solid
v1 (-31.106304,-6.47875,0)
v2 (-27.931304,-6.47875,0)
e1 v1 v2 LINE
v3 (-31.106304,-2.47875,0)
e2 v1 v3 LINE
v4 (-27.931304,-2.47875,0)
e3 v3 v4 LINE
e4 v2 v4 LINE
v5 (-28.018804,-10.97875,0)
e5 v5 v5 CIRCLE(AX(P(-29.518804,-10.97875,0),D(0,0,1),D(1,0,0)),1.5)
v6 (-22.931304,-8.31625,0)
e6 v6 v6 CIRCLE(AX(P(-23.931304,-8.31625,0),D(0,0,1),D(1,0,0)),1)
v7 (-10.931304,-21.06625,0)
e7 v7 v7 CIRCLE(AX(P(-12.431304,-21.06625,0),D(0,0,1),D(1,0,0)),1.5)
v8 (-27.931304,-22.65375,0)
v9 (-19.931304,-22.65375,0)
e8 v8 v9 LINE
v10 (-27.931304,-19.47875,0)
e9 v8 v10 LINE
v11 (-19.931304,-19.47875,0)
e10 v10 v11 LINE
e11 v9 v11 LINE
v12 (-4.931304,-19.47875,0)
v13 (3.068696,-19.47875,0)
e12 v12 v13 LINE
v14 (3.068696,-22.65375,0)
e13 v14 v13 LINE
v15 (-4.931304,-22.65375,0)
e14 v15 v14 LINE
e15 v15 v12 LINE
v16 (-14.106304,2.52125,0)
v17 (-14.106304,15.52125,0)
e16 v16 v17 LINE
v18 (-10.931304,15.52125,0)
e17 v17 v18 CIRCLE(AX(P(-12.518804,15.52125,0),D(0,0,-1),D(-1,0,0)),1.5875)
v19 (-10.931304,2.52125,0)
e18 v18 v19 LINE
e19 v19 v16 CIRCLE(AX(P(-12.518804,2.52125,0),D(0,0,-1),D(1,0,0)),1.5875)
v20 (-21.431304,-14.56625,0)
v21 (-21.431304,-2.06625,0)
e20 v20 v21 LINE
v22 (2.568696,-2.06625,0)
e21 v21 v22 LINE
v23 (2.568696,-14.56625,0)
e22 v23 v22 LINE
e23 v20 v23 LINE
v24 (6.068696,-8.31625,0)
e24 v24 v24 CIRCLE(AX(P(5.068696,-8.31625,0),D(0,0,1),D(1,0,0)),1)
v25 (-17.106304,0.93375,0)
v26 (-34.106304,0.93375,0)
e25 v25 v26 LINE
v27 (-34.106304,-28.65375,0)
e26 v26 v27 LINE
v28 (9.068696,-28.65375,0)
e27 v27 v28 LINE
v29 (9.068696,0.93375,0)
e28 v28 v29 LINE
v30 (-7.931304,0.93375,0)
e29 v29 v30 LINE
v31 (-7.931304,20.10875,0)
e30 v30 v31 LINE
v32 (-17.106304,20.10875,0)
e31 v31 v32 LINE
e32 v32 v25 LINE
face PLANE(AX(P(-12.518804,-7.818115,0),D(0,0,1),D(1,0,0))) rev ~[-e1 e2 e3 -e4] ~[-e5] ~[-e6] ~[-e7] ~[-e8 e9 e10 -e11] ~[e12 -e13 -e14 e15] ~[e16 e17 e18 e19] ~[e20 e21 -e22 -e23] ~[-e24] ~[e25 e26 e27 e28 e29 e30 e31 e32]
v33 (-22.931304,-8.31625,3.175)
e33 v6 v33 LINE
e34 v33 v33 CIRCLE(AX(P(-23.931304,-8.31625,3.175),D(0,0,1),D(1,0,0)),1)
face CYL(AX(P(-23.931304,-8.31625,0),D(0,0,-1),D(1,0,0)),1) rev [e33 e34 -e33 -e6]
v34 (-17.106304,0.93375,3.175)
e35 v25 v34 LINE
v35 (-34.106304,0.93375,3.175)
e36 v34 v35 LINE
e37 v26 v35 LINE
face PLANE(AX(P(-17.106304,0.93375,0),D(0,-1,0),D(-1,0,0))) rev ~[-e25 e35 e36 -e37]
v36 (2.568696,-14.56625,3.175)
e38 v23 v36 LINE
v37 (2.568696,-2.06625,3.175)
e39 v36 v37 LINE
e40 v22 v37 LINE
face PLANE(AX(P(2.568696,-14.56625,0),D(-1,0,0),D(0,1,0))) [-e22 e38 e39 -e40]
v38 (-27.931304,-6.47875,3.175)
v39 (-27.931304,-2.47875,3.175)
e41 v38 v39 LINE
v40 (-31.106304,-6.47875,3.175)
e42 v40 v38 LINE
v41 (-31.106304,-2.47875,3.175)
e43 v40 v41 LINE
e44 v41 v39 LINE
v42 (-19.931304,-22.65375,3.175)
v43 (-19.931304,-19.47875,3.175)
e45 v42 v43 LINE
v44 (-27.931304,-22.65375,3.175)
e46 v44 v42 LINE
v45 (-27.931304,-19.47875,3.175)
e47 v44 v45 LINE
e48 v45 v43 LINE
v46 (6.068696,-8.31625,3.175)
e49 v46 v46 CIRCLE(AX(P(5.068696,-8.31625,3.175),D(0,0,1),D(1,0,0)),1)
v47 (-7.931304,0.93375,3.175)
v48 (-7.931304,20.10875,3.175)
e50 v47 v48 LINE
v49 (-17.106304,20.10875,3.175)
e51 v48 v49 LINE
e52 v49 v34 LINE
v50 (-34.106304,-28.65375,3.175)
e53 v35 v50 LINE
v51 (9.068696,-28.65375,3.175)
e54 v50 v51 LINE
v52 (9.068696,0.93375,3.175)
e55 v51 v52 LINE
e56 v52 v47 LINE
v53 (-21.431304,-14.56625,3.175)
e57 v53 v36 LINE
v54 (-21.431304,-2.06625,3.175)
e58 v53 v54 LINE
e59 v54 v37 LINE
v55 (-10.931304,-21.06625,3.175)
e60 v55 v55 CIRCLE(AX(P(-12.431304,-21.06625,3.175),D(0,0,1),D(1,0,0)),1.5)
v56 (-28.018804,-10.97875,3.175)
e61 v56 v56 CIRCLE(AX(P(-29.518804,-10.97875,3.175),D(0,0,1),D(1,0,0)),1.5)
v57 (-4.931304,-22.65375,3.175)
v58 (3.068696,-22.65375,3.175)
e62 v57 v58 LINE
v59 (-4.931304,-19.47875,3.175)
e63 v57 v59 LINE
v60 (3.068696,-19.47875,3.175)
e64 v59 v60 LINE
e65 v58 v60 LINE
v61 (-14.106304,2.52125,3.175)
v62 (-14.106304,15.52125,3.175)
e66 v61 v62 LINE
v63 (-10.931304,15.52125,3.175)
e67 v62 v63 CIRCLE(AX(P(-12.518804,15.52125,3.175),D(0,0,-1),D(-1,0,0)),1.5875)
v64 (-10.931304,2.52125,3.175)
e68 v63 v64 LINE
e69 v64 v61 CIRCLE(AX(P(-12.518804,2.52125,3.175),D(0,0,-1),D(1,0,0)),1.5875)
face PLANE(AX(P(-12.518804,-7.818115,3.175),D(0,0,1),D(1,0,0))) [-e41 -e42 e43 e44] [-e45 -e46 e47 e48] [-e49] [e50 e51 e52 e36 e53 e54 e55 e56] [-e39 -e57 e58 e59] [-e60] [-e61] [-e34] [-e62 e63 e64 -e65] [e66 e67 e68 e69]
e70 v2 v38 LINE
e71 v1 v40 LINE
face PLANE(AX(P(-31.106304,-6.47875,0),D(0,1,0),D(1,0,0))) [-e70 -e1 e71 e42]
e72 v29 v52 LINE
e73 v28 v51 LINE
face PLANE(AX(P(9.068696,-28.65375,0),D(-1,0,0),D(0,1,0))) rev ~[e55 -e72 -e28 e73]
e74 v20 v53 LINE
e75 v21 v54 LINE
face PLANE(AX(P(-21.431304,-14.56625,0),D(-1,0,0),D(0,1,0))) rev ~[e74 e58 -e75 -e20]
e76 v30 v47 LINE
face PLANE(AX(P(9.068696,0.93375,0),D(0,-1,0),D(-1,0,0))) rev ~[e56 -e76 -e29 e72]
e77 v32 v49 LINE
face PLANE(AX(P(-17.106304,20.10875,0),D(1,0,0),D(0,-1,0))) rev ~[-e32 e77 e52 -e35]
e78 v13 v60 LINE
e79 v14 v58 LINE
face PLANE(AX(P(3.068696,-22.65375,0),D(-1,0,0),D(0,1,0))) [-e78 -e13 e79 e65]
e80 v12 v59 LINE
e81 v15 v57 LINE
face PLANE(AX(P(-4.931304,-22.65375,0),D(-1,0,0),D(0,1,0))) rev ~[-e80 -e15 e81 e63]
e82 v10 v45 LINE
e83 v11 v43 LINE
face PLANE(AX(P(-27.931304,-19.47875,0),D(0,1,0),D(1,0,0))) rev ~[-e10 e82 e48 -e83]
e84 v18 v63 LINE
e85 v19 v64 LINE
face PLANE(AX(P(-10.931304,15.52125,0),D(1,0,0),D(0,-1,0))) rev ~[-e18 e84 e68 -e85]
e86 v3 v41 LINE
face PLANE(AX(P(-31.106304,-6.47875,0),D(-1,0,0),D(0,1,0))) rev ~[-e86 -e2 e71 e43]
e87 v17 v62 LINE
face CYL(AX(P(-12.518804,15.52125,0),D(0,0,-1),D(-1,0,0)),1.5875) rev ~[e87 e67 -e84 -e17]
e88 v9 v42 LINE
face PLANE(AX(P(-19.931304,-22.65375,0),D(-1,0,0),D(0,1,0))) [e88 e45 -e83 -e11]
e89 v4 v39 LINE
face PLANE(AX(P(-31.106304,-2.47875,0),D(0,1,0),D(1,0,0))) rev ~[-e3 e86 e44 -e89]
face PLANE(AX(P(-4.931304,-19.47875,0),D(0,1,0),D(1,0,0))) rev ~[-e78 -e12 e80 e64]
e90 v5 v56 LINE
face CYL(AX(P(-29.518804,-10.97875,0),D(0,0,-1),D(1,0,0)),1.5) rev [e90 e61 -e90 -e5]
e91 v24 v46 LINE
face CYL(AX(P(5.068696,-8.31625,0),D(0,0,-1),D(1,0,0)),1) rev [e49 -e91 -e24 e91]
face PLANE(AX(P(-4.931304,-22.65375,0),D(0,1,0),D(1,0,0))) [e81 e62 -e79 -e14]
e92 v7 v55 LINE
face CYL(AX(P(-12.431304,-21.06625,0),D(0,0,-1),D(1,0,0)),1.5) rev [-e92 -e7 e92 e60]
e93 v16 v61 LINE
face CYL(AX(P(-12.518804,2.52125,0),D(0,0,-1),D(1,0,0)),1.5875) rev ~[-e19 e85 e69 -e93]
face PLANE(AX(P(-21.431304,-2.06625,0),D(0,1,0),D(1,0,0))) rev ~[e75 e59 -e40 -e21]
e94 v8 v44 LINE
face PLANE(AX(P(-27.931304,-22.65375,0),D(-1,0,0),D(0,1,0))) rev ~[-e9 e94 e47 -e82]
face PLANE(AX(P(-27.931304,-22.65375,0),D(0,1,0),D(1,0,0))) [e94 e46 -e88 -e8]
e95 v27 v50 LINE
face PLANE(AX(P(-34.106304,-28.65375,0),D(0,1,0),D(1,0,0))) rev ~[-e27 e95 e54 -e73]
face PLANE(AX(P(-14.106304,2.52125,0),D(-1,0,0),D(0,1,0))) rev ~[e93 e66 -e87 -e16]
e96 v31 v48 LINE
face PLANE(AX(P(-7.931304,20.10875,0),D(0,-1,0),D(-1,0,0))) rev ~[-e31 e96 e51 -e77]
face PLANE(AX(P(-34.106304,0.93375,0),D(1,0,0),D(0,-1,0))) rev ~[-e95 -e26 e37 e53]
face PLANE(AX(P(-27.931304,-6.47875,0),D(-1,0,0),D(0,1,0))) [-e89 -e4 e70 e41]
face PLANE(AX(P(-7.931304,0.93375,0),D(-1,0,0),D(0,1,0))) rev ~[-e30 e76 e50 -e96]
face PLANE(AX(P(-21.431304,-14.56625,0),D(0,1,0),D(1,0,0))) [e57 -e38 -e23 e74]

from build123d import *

# Parameters (mm, degrees)
F0_W     = 8
F0_H     = 3.175
F0_R     = 1.5
F0_W_2   = 3.175
F0_H_2   = 4
F0_R_2   = 1
F0_W_3   = 24
F0_H_3   = 12.5
F1_DEPTH = 3.175


# Not quite as in the source:
# - a length typed as a fraction of an inch, garbled in the dataset ("3 / 203.2 mm" for 3/8 in), is restored


with BuildPart() as f1:
    # F0 (on Top) → F1 (new body)
    with BuildSketch(Plane.XY):
        Polygon((-34.1063038088, 0.9337500209), (-34.1063038088, -28.6537499791), (9.0686961912, -28.6537499791), (9.0686961912, 0.9337500209), (-7.9313038088, 0.9337500209), (-7.9313038088, 20.1087500209), (-17.1063038088, 20.1087500209), (-17.1063038088, 0.9337500209), align=None)
        with Locations((-23.9313038088, -21.0662499791)):
            Rectangle(F0_W, F0_H, mode=Mode.SUBTRACT)
        with Locations((-29.5188038088, -10.9787499791)):
            Circle(F0_R, mode=Mode.SUBTRACT)
        with Locations((-29.5188038088, -4.4787499791)):
            Rectangle(F0_W_2, F0_H_2, mode=Mode.SUBTRACT)
        with Locations((-23.9313038088, -8.3162499791)):
            Circle(F0_R_2, mode=Mode.SUBTRACT)
        with Locations((-12.4313038088, -21.0662499791)):
            Circle(F0_R, mode=Mode.SUBTRACT)
        with Locations((-0.9313038088, -21.0662499791)):
            Rectangle(F0_W, F0_H, mode=Mode.SUBTRACT)
        with Locations((-9.4313038088, -8.3162499791)):
            Rectangle(F0_W_3, F0_H_3, mode=Mode.SUBTRACT)
        with Locations((5.0686961912, -8.3162499791)):
            Circle(F0_R_2, mode=Mode.SUBTRACT)
        with BuildLine():
            ThreePointArc((-14.1063038088, 15.5212500209), (-12.5188038088, 17.1087500209), (-10.9313038088, 15.5212500209))
            Line((-10.9313038088, 15.5212500209), (-10.9313038088, 2.5212500209))
            ThreePointArc((-10.9313038088, 2.5212500209), (-12.5188038088, 0.9337500209), (-14.1063038088, 2.5212500209))
            Line((-14.1063038088, 2.5212500209), (-14.1063038088, 15.5212500209))
        make_face(mode=Mode.SUBTRACT)
    extrude(amount=F1_DEPTH)


solid = f1.part
